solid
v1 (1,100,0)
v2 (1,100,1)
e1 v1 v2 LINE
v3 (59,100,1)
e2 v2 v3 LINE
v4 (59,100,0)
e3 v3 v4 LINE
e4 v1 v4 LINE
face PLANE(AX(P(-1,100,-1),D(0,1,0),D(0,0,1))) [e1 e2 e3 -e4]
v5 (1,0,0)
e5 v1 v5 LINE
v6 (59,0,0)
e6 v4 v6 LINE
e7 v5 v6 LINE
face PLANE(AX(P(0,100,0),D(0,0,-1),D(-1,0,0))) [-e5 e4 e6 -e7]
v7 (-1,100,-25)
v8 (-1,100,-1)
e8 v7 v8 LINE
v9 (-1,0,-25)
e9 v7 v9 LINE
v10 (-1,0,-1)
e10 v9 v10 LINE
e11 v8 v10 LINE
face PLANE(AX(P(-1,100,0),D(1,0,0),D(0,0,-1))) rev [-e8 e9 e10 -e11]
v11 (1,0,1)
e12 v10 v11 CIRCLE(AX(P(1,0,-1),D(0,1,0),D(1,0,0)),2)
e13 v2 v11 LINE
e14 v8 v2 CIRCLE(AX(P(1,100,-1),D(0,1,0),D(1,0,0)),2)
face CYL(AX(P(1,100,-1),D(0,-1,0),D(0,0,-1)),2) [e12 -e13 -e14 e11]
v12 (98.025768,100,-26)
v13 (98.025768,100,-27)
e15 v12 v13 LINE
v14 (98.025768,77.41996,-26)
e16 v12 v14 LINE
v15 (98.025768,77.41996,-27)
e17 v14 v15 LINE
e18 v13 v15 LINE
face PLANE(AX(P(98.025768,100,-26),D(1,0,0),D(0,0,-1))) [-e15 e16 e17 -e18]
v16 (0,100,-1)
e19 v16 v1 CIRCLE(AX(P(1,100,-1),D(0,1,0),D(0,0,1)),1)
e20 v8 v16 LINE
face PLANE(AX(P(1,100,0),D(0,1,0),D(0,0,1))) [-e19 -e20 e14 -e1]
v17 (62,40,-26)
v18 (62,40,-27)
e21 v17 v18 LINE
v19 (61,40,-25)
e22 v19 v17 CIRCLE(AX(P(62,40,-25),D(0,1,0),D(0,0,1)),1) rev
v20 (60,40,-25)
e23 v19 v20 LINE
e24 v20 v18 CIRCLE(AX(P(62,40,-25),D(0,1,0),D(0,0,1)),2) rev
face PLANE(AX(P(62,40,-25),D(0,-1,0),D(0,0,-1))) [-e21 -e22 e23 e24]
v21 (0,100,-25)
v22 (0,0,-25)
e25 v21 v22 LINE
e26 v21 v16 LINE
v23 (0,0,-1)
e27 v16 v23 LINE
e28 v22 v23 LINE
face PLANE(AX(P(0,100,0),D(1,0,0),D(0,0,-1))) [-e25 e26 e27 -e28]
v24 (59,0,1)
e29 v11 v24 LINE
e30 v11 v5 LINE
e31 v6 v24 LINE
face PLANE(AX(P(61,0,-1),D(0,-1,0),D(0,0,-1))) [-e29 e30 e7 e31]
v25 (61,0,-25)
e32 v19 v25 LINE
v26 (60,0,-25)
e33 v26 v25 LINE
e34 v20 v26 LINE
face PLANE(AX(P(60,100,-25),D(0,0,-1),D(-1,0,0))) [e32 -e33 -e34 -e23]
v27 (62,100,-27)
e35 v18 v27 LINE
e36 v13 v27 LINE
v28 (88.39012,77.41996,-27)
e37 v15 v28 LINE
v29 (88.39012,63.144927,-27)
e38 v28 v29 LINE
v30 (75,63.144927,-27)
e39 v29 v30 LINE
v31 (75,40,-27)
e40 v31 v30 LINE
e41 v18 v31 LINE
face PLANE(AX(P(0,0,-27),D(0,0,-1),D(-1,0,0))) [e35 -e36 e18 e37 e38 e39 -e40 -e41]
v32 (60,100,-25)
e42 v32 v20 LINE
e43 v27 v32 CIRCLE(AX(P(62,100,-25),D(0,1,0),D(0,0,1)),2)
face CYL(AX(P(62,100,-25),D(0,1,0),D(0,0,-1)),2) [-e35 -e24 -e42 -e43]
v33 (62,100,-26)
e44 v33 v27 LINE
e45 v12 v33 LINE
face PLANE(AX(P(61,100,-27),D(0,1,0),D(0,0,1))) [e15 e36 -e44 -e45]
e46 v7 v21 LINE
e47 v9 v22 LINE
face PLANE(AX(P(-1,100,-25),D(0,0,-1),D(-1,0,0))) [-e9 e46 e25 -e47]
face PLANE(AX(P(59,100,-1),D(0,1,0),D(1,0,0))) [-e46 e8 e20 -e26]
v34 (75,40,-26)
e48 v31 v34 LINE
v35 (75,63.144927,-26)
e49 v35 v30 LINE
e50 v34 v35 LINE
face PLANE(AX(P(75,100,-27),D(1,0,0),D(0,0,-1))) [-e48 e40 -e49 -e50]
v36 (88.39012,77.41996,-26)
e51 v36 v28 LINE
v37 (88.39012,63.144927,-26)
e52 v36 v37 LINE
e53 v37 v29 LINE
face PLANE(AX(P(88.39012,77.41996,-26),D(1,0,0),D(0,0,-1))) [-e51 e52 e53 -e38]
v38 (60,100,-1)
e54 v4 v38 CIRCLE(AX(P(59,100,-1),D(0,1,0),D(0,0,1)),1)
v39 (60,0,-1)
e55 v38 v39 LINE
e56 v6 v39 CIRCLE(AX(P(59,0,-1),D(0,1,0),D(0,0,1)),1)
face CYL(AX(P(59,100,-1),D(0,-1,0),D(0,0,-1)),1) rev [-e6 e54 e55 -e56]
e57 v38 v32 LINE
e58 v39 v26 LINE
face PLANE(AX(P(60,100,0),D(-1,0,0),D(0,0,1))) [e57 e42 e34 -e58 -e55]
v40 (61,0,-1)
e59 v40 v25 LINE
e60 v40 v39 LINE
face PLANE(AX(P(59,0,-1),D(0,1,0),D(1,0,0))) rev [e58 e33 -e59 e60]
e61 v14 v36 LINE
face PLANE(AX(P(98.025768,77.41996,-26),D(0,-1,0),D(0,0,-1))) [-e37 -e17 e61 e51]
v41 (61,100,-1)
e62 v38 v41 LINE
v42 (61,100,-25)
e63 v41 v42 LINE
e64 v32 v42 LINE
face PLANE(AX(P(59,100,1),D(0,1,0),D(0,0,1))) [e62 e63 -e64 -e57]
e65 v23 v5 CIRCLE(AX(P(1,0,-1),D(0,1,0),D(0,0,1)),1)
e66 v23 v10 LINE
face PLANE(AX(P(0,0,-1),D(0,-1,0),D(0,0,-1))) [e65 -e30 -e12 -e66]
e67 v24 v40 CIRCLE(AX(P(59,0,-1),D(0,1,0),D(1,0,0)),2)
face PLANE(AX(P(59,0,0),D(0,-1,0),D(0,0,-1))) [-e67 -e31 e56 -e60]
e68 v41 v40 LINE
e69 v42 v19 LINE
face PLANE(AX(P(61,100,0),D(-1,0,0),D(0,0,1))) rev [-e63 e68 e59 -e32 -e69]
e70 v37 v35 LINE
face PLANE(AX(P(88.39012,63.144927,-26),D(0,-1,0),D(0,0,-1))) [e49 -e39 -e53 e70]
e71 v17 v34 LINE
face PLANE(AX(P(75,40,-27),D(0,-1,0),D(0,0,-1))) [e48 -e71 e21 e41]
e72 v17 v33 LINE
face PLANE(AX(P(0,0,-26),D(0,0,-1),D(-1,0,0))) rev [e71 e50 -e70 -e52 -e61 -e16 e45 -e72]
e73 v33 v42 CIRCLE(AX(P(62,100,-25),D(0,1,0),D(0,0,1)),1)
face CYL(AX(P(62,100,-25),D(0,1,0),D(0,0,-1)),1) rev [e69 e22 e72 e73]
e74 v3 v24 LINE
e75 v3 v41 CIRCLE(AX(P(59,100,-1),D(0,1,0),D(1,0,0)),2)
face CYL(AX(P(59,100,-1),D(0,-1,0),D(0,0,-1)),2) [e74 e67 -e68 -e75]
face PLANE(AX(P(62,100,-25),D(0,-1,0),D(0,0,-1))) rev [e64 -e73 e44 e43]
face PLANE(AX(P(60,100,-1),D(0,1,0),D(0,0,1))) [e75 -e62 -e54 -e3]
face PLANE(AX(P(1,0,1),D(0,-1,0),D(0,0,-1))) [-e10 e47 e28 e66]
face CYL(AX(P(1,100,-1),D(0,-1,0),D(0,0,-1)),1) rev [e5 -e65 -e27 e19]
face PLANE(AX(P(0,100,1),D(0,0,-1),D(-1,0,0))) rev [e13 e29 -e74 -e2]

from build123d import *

# Parameters (mm, degrees)
Z_KLADN_PLECH1_DEPTH = 100
LEM_Z_HRANY1_DEPTH   = 60
OU_KO1_DEPTH         = 1


# Sheet-metal steps are written as plain solids
with BuildPart() as part:
    # Skica1 → Základní plech1 (new body)
    with BuildSketch(Plane(origin=(0, 0, 0), x_dir=(1, 0, 0), z_dir=(0, 1, 0))):
        with BuildLine():
            Line((0, 25), (0, 1))
            ThreePointArc((0, 1), (0.292893219, 0.292893219), (1, 0))
            Line((1, 0), (59, 0))
            ThreePointArc((59, 0), (59.707106781, 0.292893219), (60, 1))
            Line((60, 1), (60, 25))
            Line((60, 25), (61, 25))
            Line((61, 25), (61, 1))
            ThreePointArc((61, 1), (60.414213562, -0.414213562), (59, -1))
            Line((59, -1), (1, -1))
            ThreePointArc((1, -1), (-0.414213562, -0.414213562), (-1, 1))
            Line((-1, 1), (-1, 25))
            Line((-1, 25), (0, 25))
        make_face()
    extrude(amount=Z_KLADN_PLECH1_DEPTH)

    # Lem z hrany1 section (across the edge) → Lem z hrany1 (add)
    with BuildSketch(Plane(origin=(61, 40, -26), x_dir=(0, 0, 1), z_dir=(0, 1, 0))):
        with BuildLine():
            Line((-1, 1), (-1, 14))
            Line((-1, 14), (0, 14))
            Line((0, 14), (0, 1))
            ThreePointArc((0, 1), (0.292893219, 0.292893219), (1, 0))
            Line((1, 0), (1, -1))
            ThreePointArc((1, -1), (-0.414213562, -0.414213562), (-1, 1))
        make_face()
    extrude(amount=LEM_Z_HRANY1_DEPTH)

    # Skica9 → Ouško1 (add)
    with BuildSketch(Plane(origin=(0, 0, -27), x_dir=(-1, 0, 0), z_dir=(0, 0, -1))):
        Polygon((-98.025768087, 100), (-75, 100), (-75, 63.144926654), (-88.390120494, 63.144926654), (-88.390120494, 77.419960125), (-98.025768087, 77.419960125), align=None)
    extrude(amount=-OU_KO1_DEPTH)


solid = part.part
